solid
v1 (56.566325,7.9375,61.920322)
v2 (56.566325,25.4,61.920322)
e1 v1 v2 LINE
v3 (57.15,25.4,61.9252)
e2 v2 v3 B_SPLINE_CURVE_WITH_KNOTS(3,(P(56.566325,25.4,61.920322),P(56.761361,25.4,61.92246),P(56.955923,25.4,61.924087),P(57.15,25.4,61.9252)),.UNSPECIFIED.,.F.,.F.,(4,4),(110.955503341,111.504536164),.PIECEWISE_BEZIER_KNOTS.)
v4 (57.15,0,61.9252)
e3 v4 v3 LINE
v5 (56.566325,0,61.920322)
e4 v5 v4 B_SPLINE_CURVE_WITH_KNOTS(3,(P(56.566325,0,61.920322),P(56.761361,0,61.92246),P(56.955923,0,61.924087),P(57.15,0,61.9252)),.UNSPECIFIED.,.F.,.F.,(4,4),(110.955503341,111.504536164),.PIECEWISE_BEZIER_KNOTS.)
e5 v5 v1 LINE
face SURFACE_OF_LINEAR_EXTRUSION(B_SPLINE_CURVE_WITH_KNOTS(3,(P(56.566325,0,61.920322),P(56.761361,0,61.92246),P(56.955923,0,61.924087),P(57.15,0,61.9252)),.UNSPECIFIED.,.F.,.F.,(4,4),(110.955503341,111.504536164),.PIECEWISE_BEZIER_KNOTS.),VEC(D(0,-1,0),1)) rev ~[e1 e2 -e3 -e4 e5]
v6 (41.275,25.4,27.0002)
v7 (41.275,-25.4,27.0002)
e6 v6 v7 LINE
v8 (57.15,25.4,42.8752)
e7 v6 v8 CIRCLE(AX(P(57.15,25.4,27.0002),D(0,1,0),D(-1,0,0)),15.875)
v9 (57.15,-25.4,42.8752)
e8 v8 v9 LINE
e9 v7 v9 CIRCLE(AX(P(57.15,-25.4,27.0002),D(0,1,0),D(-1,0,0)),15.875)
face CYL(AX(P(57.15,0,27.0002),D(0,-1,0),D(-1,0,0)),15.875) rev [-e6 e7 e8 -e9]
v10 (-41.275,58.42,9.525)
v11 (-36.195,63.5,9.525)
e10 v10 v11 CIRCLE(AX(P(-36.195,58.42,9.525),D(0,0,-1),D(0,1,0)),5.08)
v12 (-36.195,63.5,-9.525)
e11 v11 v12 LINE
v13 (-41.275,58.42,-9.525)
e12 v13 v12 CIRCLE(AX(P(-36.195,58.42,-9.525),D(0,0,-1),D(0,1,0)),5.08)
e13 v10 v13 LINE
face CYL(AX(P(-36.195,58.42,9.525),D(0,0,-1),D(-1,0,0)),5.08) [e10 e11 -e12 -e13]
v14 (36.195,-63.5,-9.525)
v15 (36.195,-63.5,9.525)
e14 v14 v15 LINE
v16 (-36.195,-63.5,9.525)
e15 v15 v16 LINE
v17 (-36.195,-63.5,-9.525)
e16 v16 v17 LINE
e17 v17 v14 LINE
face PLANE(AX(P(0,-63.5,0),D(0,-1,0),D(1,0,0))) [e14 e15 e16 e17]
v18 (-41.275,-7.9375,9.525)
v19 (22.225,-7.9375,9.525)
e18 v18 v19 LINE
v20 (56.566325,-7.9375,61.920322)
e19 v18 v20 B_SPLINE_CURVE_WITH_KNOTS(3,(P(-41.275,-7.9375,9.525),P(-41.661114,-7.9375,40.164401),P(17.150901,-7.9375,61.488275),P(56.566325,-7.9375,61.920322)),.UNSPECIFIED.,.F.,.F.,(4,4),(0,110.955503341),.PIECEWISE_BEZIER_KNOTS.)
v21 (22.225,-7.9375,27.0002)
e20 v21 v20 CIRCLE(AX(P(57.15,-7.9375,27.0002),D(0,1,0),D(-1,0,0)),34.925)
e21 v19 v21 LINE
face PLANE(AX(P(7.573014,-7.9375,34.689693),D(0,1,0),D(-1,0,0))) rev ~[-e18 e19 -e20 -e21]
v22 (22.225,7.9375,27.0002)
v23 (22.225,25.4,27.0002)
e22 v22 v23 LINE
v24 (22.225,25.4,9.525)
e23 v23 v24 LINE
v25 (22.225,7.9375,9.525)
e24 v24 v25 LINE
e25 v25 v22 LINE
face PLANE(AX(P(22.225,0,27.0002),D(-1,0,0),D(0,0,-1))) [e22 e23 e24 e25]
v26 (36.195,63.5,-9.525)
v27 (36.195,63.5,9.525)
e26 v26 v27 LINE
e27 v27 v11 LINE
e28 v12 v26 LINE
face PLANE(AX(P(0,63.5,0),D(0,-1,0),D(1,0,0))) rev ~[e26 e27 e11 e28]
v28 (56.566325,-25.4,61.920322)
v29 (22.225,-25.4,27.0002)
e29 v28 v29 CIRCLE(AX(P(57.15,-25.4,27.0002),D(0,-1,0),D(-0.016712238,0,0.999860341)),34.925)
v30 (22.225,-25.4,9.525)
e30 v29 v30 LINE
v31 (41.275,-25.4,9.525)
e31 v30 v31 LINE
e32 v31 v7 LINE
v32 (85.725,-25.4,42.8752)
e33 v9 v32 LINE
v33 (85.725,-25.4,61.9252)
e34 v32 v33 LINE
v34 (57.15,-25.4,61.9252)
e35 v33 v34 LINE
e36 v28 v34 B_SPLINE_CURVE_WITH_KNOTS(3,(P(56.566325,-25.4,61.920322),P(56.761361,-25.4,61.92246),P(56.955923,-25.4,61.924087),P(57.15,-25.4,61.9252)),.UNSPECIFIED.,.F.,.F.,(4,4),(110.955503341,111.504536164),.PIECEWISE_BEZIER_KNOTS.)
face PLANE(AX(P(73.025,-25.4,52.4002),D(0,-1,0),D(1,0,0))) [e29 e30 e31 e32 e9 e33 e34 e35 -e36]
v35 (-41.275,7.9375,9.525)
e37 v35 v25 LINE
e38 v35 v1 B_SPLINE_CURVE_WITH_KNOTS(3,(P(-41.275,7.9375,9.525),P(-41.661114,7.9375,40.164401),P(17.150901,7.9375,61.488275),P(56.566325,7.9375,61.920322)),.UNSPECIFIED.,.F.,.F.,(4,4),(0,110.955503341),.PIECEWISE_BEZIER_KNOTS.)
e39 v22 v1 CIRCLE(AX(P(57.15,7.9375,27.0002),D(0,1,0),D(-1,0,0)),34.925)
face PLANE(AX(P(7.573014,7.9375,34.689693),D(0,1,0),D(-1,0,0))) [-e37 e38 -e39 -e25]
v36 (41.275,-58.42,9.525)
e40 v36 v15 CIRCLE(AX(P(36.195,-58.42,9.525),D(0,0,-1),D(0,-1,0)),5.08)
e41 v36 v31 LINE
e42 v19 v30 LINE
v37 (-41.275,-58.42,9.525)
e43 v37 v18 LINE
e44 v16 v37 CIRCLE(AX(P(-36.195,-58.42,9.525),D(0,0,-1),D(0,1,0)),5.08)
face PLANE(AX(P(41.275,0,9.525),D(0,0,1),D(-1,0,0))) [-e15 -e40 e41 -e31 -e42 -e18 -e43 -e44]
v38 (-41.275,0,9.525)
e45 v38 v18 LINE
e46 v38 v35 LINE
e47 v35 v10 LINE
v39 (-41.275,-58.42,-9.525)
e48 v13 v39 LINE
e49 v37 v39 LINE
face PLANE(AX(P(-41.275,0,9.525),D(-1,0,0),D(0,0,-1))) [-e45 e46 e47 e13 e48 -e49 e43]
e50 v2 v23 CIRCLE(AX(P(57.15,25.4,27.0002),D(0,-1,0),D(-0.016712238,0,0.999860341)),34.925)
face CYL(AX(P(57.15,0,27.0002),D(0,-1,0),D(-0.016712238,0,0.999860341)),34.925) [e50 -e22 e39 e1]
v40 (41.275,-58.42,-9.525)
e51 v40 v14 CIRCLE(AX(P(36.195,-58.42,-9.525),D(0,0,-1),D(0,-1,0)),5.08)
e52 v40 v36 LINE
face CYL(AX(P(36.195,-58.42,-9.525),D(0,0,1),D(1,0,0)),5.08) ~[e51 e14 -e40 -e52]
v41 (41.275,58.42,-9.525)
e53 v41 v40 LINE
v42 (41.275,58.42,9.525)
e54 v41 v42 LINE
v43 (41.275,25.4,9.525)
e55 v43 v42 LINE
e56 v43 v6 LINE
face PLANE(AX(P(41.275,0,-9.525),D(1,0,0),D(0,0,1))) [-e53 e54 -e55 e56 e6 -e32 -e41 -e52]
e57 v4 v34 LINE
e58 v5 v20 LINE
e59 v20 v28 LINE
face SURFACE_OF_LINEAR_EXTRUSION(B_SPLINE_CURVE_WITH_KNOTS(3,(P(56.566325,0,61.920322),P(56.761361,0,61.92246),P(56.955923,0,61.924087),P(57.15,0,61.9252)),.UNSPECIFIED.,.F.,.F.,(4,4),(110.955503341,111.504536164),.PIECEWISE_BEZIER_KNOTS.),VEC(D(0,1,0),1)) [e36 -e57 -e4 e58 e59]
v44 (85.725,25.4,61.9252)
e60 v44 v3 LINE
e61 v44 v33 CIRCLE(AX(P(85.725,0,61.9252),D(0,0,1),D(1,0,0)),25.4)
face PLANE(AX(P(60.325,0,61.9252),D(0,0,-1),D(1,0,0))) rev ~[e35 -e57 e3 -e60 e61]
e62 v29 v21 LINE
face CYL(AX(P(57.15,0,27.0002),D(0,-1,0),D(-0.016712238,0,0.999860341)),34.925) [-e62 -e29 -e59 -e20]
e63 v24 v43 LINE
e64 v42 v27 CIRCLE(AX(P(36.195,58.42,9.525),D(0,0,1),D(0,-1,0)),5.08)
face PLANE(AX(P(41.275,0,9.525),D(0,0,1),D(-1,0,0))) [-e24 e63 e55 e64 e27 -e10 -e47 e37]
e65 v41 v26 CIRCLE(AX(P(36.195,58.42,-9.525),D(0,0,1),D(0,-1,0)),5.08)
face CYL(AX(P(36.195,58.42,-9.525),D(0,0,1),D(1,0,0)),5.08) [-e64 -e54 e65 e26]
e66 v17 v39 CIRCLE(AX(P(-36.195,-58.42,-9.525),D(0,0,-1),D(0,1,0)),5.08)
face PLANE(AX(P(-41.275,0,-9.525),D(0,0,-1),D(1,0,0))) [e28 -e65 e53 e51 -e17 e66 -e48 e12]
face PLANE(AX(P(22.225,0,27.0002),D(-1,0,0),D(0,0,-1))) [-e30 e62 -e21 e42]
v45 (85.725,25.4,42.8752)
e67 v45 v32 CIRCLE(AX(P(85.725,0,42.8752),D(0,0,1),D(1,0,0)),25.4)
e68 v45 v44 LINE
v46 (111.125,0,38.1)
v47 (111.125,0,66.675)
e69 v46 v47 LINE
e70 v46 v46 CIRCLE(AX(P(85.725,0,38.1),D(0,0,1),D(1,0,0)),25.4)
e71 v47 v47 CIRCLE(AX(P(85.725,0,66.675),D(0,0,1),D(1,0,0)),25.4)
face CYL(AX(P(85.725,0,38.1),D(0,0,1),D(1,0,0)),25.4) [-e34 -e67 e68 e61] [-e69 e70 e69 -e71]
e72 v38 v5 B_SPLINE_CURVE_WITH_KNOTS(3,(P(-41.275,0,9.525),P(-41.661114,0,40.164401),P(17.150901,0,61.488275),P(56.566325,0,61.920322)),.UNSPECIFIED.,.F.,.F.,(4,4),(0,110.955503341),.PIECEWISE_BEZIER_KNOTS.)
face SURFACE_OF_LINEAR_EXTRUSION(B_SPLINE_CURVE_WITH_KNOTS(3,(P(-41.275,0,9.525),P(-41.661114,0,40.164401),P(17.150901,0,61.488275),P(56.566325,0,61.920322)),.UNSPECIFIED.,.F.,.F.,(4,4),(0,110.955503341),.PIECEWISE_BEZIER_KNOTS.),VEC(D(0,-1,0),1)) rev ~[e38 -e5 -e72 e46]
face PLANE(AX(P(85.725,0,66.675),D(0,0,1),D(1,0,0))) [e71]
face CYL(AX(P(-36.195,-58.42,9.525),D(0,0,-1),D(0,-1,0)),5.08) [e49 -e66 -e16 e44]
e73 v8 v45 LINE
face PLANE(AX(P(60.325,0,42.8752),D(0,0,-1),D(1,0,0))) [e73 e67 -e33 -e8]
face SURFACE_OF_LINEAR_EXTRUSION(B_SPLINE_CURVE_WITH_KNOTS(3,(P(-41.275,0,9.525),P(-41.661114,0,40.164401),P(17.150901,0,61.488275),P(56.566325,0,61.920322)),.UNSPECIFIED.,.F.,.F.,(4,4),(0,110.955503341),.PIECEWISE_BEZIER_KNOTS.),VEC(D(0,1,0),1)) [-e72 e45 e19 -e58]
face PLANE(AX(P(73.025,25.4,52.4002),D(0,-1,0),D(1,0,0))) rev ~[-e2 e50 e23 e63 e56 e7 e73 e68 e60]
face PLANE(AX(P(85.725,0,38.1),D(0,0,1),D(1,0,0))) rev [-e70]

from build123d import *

# Parameters (mm, degrees)
F1_DEPTH = 63.5
F2_DEPTH = 7.9375
F3_DEPTH = 25.4
F0_W     = 25.4
F0_H     = 19.05
F4_DEPTH = 25.4
F6_R     = 5.08


# Not quite as in the source:
# - a feature names something its author has since deleted; it is built from what else it names


with BuildPart() as f1:
    # F0 (on Front) → F1 (new body, symmetric)
    with BuildSketch(Plane.XZ):
        Polygon((22.225, 9.525), (-41.275, 9.525), (-41.275, -9.525), (41.275, -9.525), (41.275, 9.525), align=None)
    extrude(amount=F1_DEPTH, both=True)

    # F0 (on Front) → F2 (join, symmetric)
    with BuildSketch(Plane.XZ):
        with BuildLine():
            add(Edge.make_bspline(
                [(-41.275, 9.525), (-41.6611139955, 40.1644010986), (17.1509007839, 61.4882749154), (56.5663251016, 61.9203224026)],
                knots=[0, 0, 0, 0, 110.9555033405, 110.9555033405, 110.9555033405, 110.9555033405], degree=3))
            Line((-41.275, 9.525), (22.225, 9.525))
            Line((22.225, 9.525), (22.225, 27.0002))
            ThreePointArc((22.225, 27.0002), (32.2487904829, 51.4886746276), (56.5663251016, 61.9203224026))
        make_face()
    extrude(amount=F2_DEPTH, both=True)

    # F0 (on Front) → F3 (join, symmetric)
    with BuildSketch(Plane.XZ):
        with BuildLine():
            Line((22.225, 27.0002), (22.225, 9.525))
            Line((22.225, 9.525), (41.275, 9.525))
            Line((41.275, 9.525), (41.275, 27.0002))
            ThreePointArc((41.275, 27.0002), (45.9246798487, 38.2255201513), (57.15, 42.8752))
            Line((57.15, 42.8752), (60.325, 42.8752))
            Line((60.325, 42.8752), (60.325, 61.9252))
            Line((60.325, 61.9252), (57.15, 61.9252))
            add(Edge.make_bspline(
                [(56.5663251016, 61.9203224026), (56.7613614994, 61.9224602709), (56.955922973, 61.9240866042), (57.15, 61.9252)],
                knots=[110.9555033405, 110.9555033405, 110.9555033405, 110.9555033405, 111.5045361635, 111.5045361635, 111.5045361635, 111.5045361635], degree=3))
            ThreePointArc((56.5663251016, 61.9203224026), (32.2487904829, 51.4886746276), (22.225, 27.0002))
        make_face()
    extrude(amount=F3_DEPTH, both=True)

    # F0 (on Front) → F4 (join, symmetric)
    with BuildSketch(Plane.XZ):
        with Locations((73.025, 52.4002)):
            Rectangle(F0_W, F0_H)
    extrude(amount=F4_DEPTH, both=True)

    # F0 (on Front) → F5 (revolve)
    with BuildSketch(Plane.XZ):
        Polygon((85.725, 66.675), (85.725, 61.9252), (85.725, 42.8752), (85.725, 38.1), (111.125, 38.1), (111.125, 66.675), align=None)
    revolve(axis=Axis((85.725, 0, 52.3875), (0, 0, 1)))

    # F6
    f6_edges = [f1.edges().sort_by_distance(p)[0] for p in [
        (-41.275, -63.5, 0),
        (41.275, -63.5, 0),
        (41.275, 63.5, 0),
        (-41.275, 63.5, 0),
    ]]
    fillet(f6_edges, radius=F6_R)


solid = f1.part
